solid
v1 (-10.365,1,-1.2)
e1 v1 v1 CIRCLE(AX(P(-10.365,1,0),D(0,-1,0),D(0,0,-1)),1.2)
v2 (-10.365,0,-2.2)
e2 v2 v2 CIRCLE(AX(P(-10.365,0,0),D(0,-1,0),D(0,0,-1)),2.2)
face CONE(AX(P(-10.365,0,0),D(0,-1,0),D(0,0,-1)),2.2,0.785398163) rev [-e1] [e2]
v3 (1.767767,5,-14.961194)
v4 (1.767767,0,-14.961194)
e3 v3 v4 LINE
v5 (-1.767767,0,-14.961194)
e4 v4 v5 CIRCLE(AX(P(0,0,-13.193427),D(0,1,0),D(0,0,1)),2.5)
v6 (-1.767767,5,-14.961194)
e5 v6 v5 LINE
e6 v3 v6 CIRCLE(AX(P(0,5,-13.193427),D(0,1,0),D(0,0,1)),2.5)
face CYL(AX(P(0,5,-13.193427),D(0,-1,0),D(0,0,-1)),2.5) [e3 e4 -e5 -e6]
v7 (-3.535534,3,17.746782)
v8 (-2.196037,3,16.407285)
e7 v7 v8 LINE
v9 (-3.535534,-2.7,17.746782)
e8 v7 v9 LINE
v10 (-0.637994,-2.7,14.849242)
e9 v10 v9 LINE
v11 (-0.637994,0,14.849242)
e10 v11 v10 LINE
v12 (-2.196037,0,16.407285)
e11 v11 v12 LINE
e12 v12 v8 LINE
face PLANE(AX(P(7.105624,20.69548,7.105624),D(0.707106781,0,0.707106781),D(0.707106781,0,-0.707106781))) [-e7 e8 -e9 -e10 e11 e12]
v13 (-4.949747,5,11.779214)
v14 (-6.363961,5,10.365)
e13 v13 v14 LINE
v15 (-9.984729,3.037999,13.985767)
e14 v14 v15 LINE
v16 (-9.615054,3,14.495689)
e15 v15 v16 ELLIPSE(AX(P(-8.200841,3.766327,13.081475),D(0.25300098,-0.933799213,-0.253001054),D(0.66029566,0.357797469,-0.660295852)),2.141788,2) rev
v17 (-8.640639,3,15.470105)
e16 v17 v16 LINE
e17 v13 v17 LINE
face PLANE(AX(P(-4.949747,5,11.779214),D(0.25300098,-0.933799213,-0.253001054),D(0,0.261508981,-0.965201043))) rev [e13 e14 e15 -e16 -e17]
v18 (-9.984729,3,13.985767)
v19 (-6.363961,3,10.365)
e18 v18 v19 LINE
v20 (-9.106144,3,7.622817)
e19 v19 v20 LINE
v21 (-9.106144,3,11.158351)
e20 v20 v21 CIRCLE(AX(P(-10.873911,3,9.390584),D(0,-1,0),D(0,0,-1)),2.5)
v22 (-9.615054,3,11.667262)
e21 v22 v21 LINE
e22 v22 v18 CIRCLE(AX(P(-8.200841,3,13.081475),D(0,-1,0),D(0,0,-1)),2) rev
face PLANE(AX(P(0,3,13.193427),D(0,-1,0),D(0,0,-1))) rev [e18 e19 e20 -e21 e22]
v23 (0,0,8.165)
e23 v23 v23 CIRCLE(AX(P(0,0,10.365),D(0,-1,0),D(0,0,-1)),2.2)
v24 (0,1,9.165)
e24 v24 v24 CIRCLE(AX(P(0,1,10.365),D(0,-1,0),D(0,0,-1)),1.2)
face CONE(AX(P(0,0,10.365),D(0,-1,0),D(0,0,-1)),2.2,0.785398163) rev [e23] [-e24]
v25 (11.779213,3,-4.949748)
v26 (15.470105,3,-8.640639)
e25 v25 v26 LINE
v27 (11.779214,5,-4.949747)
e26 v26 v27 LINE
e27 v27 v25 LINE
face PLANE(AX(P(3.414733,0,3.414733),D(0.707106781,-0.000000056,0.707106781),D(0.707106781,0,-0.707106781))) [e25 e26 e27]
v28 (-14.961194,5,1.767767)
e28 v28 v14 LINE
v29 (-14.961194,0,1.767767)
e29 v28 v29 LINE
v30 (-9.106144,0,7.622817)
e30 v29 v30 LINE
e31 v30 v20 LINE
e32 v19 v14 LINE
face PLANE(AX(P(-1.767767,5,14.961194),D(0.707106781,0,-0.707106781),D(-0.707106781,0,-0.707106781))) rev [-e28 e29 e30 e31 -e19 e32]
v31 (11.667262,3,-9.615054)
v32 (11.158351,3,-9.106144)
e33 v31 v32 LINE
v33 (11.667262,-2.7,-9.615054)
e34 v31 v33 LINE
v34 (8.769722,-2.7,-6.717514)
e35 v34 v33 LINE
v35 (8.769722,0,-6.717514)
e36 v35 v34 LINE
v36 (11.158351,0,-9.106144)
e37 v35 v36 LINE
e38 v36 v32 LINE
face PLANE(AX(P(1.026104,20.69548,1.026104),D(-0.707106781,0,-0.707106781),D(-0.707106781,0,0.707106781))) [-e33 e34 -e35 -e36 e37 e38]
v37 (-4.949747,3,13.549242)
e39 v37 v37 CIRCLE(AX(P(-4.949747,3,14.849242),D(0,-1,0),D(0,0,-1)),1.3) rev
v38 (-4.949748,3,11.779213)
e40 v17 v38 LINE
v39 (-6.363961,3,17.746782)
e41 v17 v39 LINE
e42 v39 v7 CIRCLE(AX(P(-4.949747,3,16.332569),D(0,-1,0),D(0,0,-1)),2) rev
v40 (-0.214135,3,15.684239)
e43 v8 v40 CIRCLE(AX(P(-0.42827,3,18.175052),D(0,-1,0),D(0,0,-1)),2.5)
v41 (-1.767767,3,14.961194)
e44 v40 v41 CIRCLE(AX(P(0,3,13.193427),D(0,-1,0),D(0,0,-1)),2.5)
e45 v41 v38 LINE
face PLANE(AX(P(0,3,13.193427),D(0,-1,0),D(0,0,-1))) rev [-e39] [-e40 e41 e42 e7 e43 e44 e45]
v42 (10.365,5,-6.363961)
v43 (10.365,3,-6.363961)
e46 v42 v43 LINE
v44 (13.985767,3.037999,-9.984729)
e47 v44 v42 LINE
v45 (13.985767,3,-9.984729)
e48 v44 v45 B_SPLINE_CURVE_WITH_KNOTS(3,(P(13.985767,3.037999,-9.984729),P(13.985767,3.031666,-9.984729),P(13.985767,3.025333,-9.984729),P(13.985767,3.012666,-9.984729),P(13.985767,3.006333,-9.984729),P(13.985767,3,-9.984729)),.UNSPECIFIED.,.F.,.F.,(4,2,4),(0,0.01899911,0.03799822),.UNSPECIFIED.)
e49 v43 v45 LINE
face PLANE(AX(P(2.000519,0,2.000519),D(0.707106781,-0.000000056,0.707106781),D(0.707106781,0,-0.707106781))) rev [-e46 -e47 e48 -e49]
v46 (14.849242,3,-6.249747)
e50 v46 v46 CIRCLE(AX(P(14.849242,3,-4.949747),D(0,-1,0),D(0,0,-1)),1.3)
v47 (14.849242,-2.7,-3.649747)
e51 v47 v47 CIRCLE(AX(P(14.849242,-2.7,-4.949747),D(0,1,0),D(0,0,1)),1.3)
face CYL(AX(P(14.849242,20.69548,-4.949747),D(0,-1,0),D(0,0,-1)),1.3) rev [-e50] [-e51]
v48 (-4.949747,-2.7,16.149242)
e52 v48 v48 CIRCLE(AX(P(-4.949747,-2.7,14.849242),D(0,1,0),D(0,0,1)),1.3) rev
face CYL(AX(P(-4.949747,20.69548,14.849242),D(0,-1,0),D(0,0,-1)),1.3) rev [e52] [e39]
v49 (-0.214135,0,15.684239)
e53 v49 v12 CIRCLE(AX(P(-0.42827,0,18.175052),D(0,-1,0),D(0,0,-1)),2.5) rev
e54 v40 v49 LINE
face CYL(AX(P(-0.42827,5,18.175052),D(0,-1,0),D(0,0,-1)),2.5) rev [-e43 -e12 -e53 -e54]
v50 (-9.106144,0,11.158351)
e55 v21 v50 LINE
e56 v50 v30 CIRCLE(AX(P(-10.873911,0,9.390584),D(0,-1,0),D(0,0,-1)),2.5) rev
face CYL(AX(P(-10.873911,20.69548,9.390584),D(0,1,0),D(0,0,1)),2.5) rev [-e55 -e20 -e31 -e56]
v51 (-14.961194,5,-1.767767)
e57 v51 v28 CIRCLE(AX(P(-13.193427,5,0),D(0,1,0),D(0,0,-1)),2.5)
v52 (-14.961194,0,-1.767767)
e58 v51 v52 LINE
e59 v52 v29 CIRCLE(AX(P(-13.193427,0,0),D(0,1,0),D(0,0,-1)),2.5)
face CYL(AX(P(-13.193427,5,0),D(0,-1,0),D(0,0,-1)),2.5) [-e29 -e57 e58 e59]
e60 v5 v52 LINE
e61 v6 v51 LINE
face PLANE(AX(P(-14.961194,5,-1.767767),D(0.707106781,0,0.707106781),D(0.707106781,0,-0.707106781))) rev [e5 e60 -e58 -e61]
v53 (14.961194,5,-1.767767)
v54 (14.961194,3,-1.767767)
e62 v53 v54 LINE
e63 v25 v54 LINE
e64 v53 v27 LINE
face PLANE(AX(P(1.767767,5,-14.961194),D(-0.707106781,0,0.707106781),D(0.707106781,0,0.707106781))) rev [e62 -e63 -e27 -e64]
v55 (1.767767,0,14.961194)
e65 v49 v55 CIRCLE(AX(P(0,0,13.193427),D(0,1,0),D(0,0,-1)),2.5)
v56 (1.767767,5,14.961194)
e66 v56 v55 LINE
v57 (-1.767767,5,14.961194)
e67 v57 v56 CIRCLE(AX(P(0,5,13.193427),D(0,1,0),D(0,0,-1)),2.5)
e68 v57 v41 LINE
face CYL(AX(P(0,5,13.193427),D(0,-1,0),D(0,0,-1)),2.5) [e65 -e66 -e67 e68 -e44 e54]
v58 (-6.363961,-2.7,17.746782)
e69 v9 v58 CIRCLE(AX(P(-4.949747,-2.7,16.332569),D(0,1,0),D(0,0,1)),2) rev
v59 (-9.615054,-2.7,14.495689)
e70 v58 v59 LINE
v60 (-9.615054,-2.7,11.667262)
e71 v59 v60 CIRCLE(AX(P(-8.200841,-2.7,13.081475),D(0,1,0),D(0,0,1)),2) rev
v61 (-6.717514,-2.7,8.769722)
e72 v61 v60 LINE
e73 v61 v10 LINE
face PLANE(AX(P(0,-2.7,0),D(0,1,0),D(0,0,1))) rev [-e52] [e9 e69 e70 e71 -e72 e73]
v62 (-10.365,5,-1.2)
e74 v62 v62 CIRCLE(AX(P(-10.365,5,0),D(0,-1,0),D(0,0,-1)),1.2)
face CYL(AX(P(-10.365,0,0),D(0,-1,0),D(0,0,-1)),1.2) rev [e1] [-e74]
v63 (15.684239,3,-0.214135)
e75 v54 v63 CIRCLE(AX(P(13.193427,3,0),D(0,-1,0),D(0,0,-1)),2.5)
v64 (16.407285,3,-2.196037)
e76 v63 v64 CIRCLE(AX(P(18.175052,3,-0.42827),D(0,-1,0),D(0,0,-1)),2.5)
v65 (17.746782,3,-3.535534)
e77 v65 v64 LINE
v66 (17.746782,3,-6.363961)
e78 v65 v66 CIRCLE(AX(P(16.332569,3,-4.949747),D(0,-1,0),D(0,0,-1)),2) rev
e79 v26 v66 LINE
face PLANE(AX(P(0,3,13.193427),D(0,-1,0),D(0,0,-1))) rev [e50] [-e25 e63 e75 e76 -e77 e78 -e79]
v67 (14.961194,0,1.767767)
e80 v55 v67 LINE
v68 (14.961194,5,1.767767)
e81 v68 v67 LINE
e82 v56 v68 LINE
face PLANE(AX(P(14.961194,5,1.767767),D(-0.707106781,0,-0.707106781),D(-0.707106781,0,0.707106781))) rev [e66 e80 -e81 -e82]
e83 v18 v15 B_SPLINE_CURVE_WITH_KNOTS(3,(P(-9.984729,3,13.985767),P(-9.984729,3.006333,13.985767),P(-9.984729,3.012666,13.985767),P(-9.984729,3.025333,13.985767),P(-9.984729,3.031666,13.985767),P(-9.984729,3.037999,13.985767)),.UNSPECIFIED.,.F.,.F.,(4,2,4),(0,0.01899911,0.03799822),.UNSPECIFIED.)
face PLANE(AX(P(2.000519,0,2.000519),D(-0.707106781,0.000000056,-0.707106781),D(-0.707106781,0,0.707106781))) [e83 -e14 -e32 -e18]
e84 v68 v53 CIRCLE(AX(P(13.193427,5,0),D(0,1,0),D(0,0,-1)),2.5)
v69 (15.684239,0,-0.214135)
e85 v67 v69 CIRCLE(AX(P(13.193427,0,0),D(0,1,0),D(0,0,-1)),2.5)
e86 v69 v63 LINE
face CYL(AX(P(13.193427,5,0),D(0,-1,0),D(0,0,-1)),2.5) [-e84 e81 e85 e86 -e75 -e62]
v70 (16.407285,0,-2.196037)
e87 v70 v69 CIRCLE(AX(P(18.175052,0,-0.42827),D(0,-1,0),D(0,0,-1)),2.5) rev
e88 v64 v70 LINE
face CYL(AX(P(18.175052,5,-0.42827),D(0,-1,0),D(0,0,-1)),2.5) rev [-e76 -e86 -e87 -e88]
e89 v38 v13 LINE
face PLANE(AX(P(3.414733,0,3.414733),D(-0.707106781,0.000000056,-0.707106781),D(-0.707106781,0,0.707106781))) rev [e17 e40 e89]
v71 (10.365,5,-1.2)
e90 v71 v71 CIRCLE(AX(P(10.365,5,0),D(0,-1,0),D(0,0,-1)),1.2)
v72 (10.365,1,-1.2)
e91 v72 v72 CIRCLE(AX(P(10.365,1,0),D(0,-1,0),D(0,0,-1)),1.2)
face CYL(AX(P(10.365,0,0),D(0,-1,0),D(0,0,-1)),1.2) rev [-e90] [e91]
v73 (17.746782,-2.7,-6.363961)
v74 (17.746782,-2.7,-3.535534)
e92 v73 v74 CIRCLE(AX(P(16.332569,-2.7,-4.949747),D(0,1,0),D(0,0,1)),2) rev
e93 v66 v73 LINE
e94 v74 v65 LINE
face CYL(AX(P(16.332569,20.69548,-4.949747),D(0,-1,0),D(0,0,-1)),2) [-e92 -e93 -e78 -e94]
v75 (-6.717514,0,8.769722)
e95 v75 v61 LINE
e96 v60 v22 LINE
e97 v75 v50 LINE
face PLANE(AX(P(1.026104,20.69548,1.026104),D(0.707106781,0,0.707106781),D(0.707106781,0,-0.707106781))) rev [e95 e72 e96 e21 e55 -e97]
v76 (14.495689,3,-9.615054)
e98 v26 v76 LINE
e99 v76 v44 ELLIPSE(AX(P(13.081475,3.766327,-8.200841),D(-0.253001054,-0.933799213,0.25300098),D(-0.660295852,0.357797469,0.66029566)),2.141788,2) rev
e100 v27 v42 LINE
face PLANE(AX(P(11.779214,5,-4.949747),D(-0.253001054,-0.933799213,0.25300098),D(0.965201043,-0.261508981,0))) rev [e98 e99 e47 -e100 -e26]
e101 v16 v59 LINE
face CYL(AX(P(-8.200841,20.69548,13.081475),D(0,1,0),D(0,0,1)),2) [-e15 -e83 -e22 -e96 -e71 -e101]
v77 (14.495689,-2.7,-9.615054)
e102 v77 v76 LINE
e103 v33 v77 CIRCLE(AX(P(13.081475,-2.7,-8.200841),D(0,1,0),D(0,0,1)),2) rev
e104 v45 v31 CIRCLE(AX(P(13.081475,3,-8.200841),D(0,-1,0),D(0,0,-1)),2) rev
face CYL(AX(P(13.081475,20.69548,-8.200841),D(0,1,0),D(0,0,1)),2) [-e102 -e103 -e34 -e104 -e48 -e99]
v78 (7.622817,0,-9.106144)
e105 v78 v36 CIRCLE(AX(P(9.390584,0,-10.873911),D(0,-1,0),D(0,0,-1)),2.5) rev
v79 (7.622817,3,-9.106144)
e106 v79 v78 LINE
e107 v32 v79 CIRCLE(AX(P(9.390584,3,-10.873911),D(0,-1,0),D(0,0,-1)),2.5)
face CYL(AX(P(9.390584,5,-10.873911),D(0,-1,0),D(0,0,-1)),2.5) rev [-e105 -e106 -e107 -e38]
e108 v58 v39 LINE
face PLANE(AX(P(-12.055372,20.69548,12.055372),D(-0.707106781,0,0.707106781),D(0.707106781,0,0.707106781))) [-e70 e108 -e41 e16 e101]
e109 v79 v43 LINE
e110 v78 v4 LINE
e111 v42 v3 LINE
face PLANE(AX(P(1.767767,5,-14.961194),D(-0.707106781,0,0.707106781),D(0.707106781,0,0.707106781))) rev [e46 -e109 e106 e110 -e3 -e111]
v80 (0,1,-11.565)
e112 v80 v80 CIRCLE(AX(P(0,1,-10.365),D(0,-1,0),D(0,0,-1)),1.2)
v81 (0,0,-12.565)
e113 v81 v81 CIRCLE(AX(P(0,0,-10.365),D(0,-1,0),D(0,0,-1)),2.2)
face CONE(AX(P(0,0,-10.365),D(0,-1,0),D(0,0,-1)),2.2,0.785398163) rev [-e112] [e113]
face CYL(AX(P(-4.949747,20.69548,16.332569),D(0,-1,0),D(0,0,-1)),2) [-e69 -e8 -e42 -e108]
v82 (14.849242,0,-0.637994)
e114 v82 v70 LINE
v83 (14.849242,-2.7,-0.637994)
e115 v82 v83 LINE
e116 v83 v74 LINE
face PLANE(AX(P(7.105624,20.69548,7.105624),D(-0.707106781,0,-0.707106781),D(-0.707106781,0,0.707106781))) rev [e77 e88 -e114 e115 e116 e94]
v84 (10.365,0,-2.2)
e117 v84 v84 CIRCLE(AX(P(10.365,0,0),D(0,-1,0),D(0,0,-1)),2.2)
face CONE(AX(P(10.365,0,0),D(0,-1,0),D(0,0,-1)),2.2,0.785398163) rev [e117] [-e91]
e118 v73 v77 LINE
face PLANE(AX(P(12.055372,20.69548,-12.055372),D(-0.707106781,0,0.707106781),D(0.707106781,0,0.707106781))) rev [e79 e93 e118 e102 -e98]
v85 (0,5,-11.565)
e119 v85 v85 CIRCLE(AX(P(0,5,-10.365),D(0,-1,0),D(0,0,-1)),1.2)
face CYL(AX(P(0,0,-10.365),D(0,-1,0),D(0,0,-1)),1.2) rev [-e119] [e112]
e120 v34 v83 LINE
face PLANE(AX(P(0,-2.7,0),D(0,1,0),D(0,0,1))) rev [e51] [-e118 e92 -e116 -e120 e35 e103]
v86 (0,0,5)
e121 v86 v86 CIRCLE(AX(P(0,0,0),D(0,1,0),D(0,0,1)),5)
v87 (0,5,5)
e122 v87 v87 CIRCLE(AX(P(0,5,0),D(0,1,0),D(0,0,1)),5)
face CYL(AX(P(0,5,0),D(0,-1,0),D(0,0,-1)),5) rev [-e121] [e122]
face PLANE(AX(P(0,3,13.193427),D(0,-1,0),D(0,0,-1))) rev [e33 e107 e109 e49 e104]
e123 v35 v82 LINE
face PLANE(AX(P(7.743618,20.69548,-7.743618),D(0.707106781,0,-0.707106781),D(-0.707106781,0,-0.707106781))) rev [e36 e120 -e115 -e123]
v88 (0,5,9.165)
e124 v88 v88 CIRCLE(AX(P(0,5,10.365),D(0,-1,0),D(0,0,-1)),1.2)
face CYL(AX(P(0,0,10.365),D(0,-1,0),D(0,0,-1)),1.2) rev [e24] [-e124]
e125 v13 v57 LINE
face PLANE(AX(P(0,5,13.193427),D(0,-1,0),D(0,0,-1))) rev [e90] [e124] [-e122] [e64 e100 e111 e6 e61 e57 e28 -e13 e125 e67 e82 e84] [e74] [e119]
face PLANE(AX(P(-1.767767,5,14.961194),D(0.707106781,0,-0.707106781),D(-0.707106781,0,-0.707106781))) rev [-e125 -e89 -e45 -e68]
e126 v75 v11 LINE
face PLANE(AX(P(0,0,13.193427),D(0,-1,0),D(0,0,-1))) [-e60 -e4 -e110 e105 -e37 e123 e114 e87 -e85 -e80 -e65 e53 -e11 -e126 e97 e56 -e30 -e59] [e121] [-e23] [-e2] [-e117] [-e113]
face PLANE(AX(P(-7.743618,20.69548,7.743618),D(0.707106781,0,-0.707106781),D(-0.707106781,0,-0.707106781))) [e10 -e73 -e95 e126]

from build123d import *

# Parameters (mm, degrees)
SKETCH1_R                                       = 0.5
SKETCH1_R_2                                     = 5
BOSS_EXTRUDE1_DEPTH                             = 5
SKETCH3_R                                       = 1.3
BOSS_EXTRUDE4_DEPTH                             = 5.7
BOSS_EXTRUDE6_DEPTH                             = 1
FILLET1_R                                       = 2.5
FILLET2_R                                       = 2
CSK_FOR_M2_FLAT_HEAD_MACHINE_SCREW5_D           = 2.4
CSK_FOR_M2_FLAT_HEAD_MACHINE_SCREW5_DEPTH       = 42.93
CSK_FOR_M2_FLAT_HEAD_MACHINE_SCREW5_CSINK_D     = 4.4
CSK_FOR_M2_FLAT_HEAD_MACHINE_SCREW5_CSINK_ANGLE = 90
CSK_FOR_M2_FLAT_HEAD_MACHINE_SCREW5_TIP         = 0.721032743


with BuildPart() as part:
    # Sketch1 → Boss-Extrude1 (new body)
    with BuildSketch(Plane(origin=(0, 0, 0), x_dir=(1, 0, 0), z_dir=(0, 1, 0))):
        with BuildLine():
            Line((1.767766953, 14.961194078), (14.961194078, 1.767766953))
            ThreePointArc((14.961194078, 1.767766953), (15.693427125, 0), (14.961194078, -1.767766953))
            Line((14.961194078, -1.767766953), (1.767766953, -14.961194078))
            ThreePointArc((1.767766953, -14.961194078), (0, -15.693427125), (-1.767766953, -14.961194078))
            Line((-1.767766953, -14.961194078), (-14.961194078, -1.767766953))
            ThreePointArc((-14.961194078, -1.767766953), (-15.693427125, 0), (-14.961194078, 1.767766953))
            Line((-14.961194078, 1.767766953), (-1.767766953, 14.961194078))
            ThreePointArc((-1.767766953, 14.961194078), (0, 15.693427125), (1.767766953, 14.961194078))
        make_face()
        with Locations(Location((0, 10.365, 0), (0, 0, 270))):
            Circle(SKETCH1_R, mode=Mode.SUBTRACT)
        with Locations(Location((0, -10.365, 0), (0, 0, 270))):
            Circle(SKETCH1_R, mode=Mode.SUBTRACT)
        with Locations(Location((10.365, 0, 0), (0, 0, 270))):
            Circle(SKETCH1_R, mode=Mode.SUBTRACT)
        with Locations(Location((-10.365, 0, 0), (0, 0, 270))):
            Circle(SKETCH1_R, mode=Mode.SUBTRACT)
        with Locations(Location((0, 0, 0), (0, 0, 270))):
            Circle(SKETCH1_R_2, mode=Mode.SUBTRACT)
    extrude(amount=BOSS_EXTRUDE1_DEPTH)

    # Sketch3 → Boss-Extrude4 (add)
    # profile 1 of 4: a face of its own
    with BuildSketch(Plane(origin=(0, -2.7, 0), x_dir=(1, 0, 0), z_dir=(0, 1, 0))):
        Polygon((-4.949747468, -10.537489101), (-0.637994164, -14.849242405), (-4.949747468, -19.160995709), (-9.261500772, -14.849242405), align=None)
        with Locations(Location((-4.949747468, -14.849242405, 0), (0, 0, 90))):
            Circle(SKETCH3_R, mode=Mode.SUBTRACT)
    # profile 2 of 4: a face of its own
    with BuildSketch(Plane(origin=(0, -2.7, 0), x_dir=(1, 0, 0), z_dir=(0, 1, 0))):
        Polygon((-6.717514421, -8.769722148), (-11.029267725, -13.081475452), (-9.261500772, -14.849242405), (-4.949747468, -10.537489101), align=None)
    # profile 3 of 4: a face of its own
    with BuildSketch(Plane(origin=(0, -2.7, 0), x_dir=(1, 0, 0), z_dir=(0, 1, 0))):
        Polygon((19.160995709, 4.949747468), (14.849242405, 9.261500772), (10.537489101, 4.949747468), (14.849242405, 0.637994164), align=None)
        with Locations(Location((14.849242405, 4.949747468, 0), (0, 0, 90))):
            Circle(SKETCH3_R, mode=Mode.SUBTRACT)
    # profile 4 of 4: a face of its own
    with BuildSketch(Plane(origin=(0, -2.7, 0), x_dir=(1, 0, 0), z_dir=(0, 1, 0))):
        Polygon((13.081475452, 11.029267725), (14.849242405, 9.261500772), (10.537489101, 4.949747468), (8.769722148, 6.717514421), align=None)
    extrude(amount=BOSS_EXTRUDE4_DEPTH)


with BuildPart() as boss_extrude6_tool:
    # Sketch7 → Boss-Extrude6 (new, symmetric)
    with BuildSketch(Plane(origin=(2.707626069, -2.13e-07, 2.707626069), x_dir=(0.7071067811865474, 0, -0.7071067811865478), z_dir=(0.7071067811865467, -5.5755039757469385e-08, 0.7071067811865462))):
        Polygon((11.829161787, 5.00000052), (17.04887, 3.00000056), (11.829161787, 3.00000052), align=None)
        Polygon((-11.829161787, 5.00000052), (-17.04887, 3.00000056), (-11.829161787, 3.00000052), align=None)
    extrude(amount=BOSS_EXTRUDE6_DEPTH, both=True)


with BuildPart() as part_1:
    add(part.part)


with BuildPart() as part_2:
    # Boss-Extrude6: joined with boss_extrude6_tool
    add(part_1.part.fuse(boss_extrude6_tool.part, tol=0.00001))

    # Fillet1
    fillet1_edges = [part_2.edges().sort_by_distance(p)[0] for p in [
        (-7.338376652, 1.5, 9.390584379),
        (-1.184018869, 1.5, 15.395267109),
        (9.390584379, 1.5, -7.338376652),
        (15.395267109, 1.5, -1.184018869),
    ]]
    fillet(fillet1_edges, radius=FILLET1_R)

    # Fillet2
    # the kernel refuses this fillet: 2 mm, written as the material it takes off along each edge
    with BuildSketch(Plane(origin=(-4.949747468, -7.7, 19.160995709), x_dir=(-0.7071067811865471, 0, -0.707106781186548), z_dir=(0, 1, 0)), Plane(origin=(13.081475452, -7.7, -11.029267725), x_dir=(0.7071067811865476, 0, 0.7071067811865476), z_dir=(0, 1, 0))) as fillet2_piece_1:
        with BuildLine():
            CenterArc((FILLET2_R, -FILLET2_R), FILLET2_R, 90, 90)
            Line((0, -FILLET2_R), (0, 0))
            Line((0, 0), (FILLET2_R, 0))
        make_face()
    extrude(amount=15.7, mode=Mode.SUBTRACT)
    with BuildSketch(Plane(origin=(-11.029267725, -7.7, 13.081475452), x_dir=(0.707106781186547, 0, 0.7071067811865479), z_dir=(0, 1, 0)), Plane(origin=(19.160995709, -7.7, -4.949747468), x_dir=(-0.7071067811865482, 0, -0.7071067811865469), z_dir=(0, 1, 0))) as fillet2_piece_2:
        with BuildLine():
            CenterArc((FILLET2_R, FILLET2_R), FILLET2_R, 180, 90)
            Line((0, FILLET2_R), (0, 0))
            Line((0, 0), (FILLET2_R, 0))
        make_face()
    extrude(amount=15.7, mode=Mode.SUBTRACT)

    # CSK for M2 Flat Head Machine Screw5
    with Locations(Plane.XZ):
        with Locations((0, 10.365), (10.365, 0), (-10.365, 0), (0, -10.365)):
            CounterSinkHole(CSK_FOR_M2_FLAT_HEAD_MACHINE_SCREW5_D / 2, CSK_FOR_M2_FLAT_HEAD_MACHINE_SCREW5_CSINK_D / 2, depth=CSK_FOR_M2_FLAT_HEAD_MACHINE_SCREW5_DEPTH, counter_sink_angle=CSK_FOR_M2_FLAT_HEAD_MACHINE_SCREW5_CSINK_ANGLE)
            with Locations((0, 0, -(CSK_FOR_M2_FLAT_HEAD_MACHINE_SCREW5_DEPTH + CSK_FOR_M2_FLAT_HEAD_MACHINE_SCREW5_TIP / 2))):  # 118° drill point
                Cone(0, CSK_FOR_M2_FLAT_HEAD_MACHINE_SCREW5_D / 2, CSK_FOR_M2_FLAT_HEAD_MACHINE_SCREW5_TIP, mode=Mode.SUBTRACT)


solid = part_2.part
